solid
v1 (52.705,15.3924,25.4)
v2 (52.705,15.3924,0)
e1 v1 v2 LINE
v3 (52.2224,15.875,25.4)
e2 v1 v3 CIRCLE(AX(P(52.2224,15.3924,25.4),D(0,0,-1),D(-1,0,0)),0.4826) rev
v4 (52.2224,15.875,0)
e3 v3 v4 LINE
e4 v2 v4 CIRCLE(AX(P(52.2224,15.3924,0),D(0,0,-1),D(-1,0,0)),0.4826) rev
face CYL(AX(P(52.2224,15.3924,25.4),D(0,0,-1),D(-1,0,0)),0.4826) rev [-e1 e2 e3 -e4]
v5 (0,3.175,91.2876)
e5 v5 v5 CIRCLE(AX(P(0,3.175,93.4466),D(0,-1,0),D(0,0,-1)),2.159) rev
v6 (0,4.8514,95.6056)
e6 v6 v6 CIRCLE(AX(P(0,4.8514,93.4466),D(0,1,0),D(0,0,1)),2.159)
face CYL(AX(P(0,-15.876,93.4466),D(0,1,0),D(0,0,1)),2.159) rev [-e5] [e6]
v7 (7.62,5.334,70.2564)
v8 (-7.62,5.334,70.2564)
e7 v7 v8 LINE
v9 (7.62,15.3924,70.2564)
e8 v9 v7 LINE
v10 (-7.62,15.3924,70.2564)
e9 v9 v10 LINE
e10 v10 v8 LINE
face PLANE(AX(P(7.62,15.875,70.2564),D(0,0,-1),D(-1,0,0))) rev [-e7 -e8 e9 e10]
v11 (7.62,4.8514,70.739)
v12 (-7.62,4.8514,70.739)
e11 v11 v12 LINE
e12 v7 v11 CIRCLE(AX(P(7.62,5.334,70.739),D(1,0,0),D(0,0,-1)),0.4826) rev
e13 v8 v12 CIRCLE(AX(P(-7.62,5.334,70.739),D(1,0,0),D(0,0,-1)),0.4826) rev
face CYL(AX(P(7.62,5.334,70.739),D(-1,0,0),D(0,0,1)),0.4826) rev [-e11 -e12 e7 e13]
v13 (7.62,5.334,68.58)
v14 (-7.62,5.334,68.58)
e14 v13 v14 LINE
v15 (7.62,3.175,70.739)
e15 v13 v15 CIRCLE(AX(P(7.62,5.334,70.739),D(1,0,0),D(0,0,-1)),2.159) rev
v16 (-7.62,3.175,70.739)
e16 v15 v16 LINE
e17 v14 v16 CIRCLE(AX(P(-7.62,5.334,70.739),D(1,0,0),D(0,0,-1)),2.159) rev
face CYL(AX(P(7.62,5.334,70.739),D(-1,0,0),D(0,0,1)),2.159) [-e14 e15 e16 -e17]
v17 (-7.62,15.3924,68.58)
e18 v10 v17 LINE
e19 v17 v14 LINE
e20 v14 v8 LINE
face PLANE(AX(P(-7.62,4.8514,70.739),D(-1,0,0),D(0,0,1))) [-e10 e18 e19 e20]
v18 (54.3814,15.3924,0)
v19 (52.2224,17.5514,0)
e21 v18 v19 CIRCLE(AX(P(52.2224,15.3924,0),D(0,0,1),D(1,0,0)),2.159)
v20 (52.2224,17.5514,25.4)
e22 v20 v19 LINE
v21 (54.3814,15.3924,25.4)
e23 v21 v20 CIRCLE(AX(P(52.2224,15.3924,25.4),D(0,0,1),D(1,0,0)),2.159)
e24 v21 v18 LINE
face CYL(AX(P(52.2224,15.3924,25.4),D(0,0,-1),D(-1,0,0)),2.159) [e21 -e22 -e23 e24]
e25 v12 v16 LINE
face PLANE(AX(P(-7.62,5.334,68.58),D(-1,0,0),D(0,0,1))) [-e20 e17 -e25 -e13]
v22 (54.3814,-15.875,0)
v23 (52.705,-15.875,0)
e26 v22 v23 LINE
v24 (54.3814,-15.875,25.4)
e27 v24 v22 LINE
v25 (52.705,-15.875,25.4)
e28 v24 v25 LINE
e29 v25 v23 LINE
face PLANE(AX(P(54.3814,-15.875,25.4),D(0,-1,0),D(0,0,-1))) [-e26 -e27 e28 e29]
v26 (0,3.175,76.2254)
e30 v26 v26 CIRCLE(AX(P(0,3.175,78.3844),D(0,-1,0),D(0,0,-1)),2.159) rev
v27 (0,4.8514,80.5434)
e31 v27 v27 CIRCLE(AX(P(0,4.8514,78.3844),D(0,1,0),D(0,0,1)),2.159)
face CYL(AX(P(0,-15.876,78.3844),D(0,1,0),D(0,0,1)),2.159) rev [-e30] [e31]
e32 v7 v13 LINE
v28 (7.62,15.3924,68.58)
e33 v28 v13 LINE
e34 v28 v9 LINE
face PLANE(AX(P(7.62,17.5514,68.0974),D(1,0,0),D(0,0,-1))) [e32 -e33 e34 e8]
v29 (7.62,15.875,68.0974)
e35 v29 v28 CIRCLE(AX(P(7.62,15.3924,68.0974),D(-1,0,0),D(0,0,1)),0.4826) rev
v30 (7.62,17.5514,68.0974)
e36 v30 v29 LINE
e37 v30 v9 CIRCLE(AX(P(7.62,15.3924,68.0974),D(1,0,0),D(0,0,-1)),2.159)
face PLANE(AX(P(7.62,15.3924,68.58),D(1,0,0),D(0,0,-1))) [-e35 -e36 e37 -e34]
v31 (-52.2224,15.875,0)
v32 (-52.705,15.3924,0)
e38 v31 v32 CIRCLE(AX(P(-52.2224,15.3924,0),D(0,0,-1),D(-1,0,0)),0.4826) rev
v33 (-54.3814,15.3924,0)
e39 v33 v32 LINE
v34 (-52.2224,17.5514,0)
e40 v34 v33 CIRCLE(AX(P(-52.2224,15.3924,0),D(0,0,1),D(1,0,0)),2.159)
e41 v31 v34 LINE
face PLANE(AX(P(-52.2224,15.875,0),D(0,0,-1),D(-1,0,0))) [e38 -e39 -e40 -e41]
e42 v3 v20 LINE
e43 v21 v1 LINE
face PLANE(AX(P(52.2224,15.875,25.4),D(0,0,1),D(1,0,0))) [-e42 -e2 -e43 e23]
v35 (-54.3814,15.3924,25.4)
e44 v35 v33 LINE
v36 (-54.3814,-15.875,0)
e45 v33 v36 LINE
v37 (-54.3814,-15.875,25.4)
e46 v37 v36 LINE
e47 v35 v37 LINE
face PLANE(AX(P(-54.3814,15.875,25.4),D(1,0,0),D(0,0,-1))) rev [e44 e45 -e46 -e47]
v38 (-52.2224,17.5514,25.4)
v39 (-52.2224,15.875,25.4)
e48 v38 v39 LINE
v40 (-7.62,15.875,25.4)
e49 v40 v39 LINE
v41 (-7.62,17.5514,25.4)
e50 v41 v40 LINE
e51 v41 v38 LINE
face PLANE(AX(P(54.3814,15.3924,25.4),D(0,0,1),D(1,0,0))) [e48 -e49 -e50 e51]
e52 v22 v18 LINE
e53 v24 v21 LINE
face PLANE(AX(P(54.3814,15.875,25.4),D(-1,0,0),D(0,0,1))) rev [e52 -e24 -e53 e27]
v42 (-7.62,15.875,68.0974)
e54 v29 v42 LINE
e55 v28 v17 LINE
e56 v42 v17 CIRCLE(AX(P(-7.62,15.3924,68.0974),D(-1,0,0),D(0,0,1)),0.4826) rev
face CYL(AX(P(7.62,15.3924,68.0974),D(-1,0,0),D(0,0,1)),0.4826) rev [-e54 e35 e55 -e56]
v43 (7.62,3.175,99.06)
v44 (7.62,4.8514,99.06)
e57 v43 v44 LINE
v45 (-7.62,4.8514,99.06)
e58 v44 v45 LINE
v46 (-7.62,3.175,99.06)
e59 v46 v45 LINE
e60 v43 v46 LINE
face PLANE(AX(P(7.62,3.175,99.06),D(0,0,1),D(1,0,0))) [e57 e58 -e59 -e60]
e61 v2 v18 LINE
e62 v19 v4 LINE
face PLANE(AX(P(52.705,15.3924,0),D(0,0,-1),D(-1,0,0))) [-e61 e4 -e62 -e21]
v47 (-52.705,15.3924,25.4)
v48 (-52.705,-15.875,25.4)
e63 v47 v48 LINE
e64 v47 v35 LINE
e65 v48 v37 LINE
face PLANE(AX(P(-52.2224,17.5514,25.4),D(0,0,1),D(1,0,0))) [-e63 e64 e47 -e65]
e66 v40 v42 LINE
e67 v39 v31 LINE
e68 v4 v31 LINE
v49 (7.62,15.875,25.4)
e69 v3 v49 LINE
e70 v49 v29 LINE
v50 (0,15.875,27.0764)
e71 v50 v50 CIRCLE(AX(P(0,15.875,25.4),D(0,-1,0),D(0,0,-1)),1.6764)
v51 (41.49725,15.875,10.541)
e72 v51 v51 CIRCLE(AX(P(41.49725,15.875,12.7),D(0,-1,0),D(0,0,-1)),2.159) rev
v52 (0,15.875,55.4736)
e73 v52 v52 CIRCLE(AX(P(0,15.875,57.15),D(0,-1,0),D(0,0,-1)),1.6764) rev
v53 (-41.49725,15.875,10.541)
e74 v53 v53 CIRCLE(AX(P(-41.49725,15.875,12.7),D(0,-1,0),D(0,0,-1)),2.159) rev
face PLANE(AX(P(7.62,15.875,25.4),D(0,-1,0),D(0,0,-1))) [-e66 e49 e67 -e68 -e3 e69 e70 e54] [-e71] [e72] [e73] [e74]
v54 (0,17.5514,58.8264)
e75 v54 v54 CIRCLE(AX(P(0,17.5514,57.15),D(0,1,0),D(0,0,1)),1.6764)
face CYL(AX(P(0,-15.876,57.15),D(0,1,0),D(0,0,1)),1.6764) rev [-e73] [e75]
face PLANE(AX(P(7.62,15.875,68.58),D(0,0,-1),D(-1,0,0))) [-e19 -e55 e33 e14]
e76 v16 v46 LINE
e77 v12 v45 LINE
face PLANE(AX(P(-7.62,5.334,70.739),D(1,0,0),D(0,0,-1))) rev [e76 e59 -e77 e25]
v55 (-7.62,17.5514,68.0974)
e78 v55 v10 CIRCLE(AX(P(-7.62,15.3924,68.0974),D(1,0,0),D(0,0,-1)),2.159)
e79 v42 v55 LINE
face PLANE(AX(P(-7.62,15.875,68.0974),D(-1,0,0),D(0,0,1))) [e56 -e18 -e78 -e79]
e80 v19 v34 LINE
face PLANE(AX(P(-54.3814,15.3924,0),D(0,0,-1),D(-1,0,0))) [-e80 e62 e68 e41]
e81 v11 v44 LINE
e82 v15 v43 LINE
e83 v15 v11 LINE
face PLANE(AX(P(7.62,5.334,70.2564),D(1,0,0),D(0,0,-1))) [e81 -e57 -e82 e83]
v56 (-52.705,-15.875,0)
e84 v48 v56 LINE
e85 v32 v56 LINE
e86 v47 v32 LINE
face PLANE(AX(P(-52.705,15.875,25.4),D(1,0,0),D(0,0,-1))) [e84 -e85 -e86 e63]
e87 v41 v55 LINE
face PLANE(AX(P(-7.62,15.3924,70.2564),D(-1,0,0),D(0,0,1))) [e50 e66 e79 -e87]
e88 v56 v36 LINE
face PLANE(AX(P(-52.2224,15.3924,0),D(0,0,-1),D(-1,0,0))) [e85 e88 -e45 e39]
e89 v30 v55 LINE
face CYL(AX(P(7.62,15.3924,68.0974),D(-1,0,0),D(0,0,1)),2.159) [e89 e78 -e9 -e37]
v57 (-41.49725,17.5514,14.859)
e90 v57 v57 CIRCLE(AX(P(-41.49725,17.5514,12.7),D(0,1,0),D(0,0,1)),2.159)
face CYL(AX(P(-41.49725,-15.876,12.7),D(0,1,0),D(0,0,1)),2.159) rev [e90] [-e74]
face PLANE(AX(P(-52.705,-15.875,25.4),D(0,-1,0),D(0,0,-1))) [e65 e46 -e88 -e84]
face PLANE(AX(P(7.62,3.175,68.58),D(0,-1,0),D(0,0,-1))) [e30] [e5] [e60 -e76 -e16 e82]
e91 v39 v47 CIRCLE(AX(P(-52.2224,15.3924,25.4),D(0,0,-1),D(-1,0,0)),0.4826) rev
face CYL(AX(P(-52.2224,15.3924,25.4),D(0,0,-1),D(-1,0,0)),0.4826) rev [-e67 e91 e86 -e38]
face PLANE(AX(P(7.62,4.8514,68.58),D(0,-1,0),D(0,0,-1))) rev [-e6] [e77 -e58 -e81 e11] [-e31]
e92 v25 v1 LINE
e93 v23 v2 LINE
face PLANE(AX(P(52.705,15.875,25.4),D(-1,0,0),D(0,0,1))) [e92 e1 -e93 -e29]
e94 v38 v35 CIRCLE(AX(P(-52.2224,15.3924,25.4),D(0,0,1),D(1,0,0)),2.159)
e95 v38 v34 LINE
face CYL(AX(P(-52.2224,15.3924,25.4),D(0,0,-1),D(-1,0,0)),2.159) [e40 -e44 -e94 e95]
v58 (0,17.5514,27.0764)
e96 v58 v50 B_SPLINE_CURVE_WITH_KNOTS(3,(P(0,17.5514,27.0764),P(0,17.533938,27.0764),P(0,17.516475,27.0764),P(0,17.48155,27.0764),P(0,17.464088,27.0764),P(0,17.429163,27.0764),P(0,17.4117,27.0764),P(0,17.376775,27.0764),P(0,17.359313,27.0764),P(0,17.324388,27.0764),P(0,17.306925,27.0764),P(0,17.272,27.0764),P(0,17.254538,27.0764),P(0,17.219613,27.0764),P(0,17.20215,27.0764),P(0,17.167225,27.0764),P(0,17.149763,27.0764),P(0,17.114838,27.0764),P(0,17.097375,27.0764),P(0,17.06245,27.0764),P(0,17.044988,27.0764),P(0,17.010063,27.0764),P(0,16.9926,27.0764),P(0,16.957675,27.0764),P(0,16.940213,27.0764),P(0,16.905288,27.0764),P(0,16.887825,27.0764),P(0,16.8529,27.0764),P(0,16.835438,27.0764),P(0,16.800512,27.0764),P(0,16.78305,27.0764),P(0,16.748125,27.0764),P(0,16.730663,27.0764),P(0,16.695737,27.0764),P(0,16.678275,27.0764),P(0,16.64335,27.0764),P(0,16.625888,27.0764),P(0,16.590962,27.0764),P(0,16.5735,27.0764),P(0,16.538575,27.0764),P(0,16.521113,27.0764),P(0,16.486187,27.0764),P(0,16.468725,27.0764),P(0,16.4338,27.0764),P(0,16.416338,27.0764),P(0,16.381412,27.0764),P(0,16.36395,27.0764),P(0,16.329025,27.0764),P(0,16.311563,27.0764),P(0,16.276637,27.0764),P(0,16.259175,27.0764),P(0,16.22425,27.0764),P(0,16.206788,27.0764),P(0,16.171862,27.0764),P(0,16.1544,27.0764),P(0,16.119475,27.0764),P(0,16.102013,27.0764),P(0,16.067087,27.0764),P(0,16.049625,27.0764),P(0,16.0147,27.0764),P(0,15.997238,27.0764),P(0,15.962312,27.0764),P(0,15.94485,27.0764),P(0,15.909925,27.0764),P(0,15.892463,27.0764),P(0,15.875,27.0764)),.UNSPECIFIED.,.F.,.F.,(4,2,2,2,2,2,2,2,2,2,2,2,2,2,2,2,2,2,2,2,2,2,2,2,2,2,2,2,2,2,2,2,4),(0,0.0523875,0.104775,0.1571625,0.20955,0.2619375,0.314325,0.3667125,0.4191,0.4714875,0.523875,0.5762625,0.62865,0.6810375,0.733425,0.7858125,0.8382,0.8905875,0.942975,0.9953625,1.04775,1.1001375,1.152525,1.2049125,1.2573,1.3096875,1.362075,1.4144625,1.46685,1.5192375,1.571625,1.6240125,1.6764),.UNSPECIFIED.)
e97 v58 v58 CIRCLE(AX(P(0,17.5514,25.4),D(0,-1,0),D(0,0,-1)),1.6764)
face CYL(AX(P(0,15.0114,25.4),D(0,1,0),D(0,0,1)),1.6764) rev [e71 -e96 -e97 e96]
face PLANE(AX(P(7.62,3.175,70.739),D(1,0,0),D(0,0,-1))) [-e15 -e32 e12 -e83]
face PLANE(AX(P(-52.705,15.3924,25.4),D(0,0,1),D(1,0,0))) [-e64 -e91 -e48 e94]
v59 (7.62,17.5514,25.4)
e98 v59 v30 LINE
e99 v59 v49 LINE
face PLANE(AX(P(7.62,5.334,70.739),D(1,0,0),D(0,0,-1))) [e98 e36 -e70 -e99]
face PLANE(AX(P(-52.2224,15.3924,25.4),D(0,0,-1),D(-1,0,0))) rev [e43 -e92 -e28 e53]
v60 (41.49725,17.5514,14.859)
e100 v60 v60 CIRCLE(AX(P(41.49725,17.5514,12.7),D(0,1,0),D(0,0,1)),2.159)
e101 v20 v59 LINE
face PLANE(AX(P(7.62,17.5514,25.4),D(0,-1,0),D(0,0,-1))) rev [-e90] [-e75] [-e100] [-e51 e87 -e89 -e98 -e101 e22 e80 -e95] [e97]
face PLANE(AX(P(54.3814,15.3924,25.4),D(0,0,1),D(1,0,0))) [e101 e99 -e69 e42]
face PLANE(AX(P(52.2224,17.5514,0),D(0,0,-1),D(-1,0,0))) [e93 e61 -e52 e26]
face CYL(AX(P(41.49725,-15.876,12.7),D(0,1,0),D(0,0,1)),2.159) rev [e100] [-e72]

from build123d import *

# Parameters (mm, degrees)
BASE_FLANGE1_DEPTH      = 25.4
BASE_FLANGE2_DEPTH      = 7.62
BASE_FLANGE2_DEPTH_BACK = 7.62
SKETCH9_R               = 2.159
CUT_EXTRUDE1_DEPTH      = 1.6764
SKETCH12_R              = 1.6764
SKETCH12_R_2            = 2.159
CUT_EXTRUDE4_DEPTH      = 1.6764
CUT_EXTRUDE5_DEPTH      = 2.54


# Sheet-metal steps are written as plain solids
with BuildPart() as part:
    # Sketch1 → Base-Flange1 (new body)
    with BuildSketch(Plane.XY):
        with BuildLine():
            Line((-52.705, -15.875), (-52.705, 15.3924))
            ThreePointArc((-52.705, 15.3924), (-52.563649733, 15.733649733), (-52.2224, 15.875))
            Line((-52.2224, 15.875), (52.2224, 15.875))
            ThreePointArc((52.2224, 15.875), (52.563649733, 15.733649733), (52.705, 15.3924))
            Line((52.705, 15.3924), (52.705, -15.875))
            Line((52.705, -15.875), (54.3814, -15.875))
            Line((54.3814, -15.875), (54.3814, 15.3924))
            ThreePointArc((54.3814, 15.3924), (53.749043541, 16.919043541), (52.2224, 17.5514))
            Line((52.2224, 17.5514), (-52.2224, 17.5514))
            ThreePointArc((-52.2224, 17.5514), (-53.749043541, 16.919043541), (-54.3814, 15.3924))
            Line((-54.3814, 15.3924), (-54.3814, -15.875))
            Line((-54.3814, -15.875), (-52.705, -15.875))
        make_face()
    extrude(amount=BASE_FLANGE1_DEPTH)


with BuildPart() as body_2:
    # Sketch6 → Base-Flange2 (new, two sides: drawn at the far end of the back side and taken through both)
    with BuildSketch(Plane(origin=(0, 0, 0), x_dir=(0, 0, -1), z_dir=(1, 0, 0)).offset(-BASE_FLANGE2_DEPTH_BACK)):
        with BuildLine():
            Line((-25.4, 15.875), (-68.0974, 15.875))
            ThreePointArc((-68.0974, 15.875), (-68.438649733, 15.733649733), (-68.58, 15.3924))
            Line((-68.58, 15.3924), (-68.58, 5.334))
            ThreePointArc((-68.58, 5.334), (-69.212356459, 3.807356459), (-70.739, 3.175))
            Line((-70.739, 3.175), (-99.06, 3.175))
            Line((-99.06, 3.175), (-99.06, 4.8514))
            Line((-99.06, 4.8514), (-70.739, 4.8514))
            ThreePointArc((-70.739, 4.8514), (-70.397750267, 4.992750267), (-70.2564, 5.334))
            Line((-70.2564, 5.334), (-70.2564, 15.3924))
            ThreePointArc((-70.2564, 15.3924), (-69.624043541, 16.919043541), (-68.0974, 17.5514))
            Line((-68.0974, 17.5514), (-25.4, 17.5514))
            Line((-25.4, 17.5514), (-25.4, 15.875))
        make_face()
    extrude(amount=BASE_FLANGE2_DEPTH + BASE_FLANGE2_DEPTH_BACK)

    # Sketch9 → Cut-Extrude1 (cut)
    with BuildSketch(Plane(origin=(0, 4.8514, 0), x_dir=(1, 0, 0), z_dir=(0, 1, 0))):
        with Locations(Location((0, -78.3844, 0), (0, 0, 270))):
            Circle(SKETCH9_R)
        with Locations(Location((0, -93.4466, 0), (0, 0, 270))):
            Circle(SKETCH9_R)
    extrude(amount=-CUT_EXTRUDE1_DEPTH, mode=Mode.SUBTRACT)


with BuildPart() as cut_extrude4_tool:
    # Sketch12 → Cut-Extrude4 (new body)
    with BuildSketch(Plane(origin=(0, 17.5514, 0), x_dir=(1, 0, 0), z_dir=(0, 1, 0))):
        with Locations(Location((0, -57.15, 0), (0, 0, 270))):
            Circle(SKETCH12_R)
        with Locations(Location((-41.49725, -12.7, 0), (0, 0, 270))):
            Circle(SKETCH12_R_2)
        with Locations(Location((41.49725, -12.7, 0), (0, 0, 270))):
            Circle(SKETCH12_R_2)
    extrude(amount=-CUT_EXTRUDE4_DEPTH)


with BuildPart() as part_1:
    add(part.part)

    # Cut-Extrude4: cut by cut_extrude4_tool
    add(cut_extrude4_tool.part, mode=Mode.SUBTRACT)


with BuildPart() as body_2_1:
    add(body_2.part)

    # Cut-Extrude4: cut by cut_extrude4_tool
    add(cut_extrude4_tool.part, mode=Mode.SUBTRACT)


with BuildPart() as cut_extrude5_tool:
    # Sketch12<3> → Cut-Extrude5 (new body)
    with BuildSketch(Plane(origin=(0, 17.5514, 0), x_dir=(1, 0, 0), z_dir=(0, 1, 0))):
        with BuildLine():
            Line((-1.6764, -25.4), (1.6764, -25.4))
            ThreePointArc((1.6764, -25.4), (0, -23.7236), (-1.6764, -25.4))
        make_face()
        with BuildLine():
            ThreePointArc((-1.6764, -25.4), (0, -27.0764), (1.6764, -25.4))
            Line((1.6764, -25.4), (-1.6764, -25.4))
        make_face()
    extrude(amount=-CUT_EXTRUDE5_DEPTH)


with BuildPart() as part_2:
    add(part_1.part)

    # Cut-Extrude5: cut by cut_extrude5_tool
    add(cut_extrude5_tool.part, mode=Mode.SUBTRACT)


with BuildPart() as body_2_2:
    add(body_2_1.part)

    # Cut-Extrude5: cut by cut_extrude5_tool
    add(cut_extrude5_tool.part, mode=Mode.SUBTRACT)

    # Combine1: union part
    add(part_2.part)


solid = body_2_2.part
